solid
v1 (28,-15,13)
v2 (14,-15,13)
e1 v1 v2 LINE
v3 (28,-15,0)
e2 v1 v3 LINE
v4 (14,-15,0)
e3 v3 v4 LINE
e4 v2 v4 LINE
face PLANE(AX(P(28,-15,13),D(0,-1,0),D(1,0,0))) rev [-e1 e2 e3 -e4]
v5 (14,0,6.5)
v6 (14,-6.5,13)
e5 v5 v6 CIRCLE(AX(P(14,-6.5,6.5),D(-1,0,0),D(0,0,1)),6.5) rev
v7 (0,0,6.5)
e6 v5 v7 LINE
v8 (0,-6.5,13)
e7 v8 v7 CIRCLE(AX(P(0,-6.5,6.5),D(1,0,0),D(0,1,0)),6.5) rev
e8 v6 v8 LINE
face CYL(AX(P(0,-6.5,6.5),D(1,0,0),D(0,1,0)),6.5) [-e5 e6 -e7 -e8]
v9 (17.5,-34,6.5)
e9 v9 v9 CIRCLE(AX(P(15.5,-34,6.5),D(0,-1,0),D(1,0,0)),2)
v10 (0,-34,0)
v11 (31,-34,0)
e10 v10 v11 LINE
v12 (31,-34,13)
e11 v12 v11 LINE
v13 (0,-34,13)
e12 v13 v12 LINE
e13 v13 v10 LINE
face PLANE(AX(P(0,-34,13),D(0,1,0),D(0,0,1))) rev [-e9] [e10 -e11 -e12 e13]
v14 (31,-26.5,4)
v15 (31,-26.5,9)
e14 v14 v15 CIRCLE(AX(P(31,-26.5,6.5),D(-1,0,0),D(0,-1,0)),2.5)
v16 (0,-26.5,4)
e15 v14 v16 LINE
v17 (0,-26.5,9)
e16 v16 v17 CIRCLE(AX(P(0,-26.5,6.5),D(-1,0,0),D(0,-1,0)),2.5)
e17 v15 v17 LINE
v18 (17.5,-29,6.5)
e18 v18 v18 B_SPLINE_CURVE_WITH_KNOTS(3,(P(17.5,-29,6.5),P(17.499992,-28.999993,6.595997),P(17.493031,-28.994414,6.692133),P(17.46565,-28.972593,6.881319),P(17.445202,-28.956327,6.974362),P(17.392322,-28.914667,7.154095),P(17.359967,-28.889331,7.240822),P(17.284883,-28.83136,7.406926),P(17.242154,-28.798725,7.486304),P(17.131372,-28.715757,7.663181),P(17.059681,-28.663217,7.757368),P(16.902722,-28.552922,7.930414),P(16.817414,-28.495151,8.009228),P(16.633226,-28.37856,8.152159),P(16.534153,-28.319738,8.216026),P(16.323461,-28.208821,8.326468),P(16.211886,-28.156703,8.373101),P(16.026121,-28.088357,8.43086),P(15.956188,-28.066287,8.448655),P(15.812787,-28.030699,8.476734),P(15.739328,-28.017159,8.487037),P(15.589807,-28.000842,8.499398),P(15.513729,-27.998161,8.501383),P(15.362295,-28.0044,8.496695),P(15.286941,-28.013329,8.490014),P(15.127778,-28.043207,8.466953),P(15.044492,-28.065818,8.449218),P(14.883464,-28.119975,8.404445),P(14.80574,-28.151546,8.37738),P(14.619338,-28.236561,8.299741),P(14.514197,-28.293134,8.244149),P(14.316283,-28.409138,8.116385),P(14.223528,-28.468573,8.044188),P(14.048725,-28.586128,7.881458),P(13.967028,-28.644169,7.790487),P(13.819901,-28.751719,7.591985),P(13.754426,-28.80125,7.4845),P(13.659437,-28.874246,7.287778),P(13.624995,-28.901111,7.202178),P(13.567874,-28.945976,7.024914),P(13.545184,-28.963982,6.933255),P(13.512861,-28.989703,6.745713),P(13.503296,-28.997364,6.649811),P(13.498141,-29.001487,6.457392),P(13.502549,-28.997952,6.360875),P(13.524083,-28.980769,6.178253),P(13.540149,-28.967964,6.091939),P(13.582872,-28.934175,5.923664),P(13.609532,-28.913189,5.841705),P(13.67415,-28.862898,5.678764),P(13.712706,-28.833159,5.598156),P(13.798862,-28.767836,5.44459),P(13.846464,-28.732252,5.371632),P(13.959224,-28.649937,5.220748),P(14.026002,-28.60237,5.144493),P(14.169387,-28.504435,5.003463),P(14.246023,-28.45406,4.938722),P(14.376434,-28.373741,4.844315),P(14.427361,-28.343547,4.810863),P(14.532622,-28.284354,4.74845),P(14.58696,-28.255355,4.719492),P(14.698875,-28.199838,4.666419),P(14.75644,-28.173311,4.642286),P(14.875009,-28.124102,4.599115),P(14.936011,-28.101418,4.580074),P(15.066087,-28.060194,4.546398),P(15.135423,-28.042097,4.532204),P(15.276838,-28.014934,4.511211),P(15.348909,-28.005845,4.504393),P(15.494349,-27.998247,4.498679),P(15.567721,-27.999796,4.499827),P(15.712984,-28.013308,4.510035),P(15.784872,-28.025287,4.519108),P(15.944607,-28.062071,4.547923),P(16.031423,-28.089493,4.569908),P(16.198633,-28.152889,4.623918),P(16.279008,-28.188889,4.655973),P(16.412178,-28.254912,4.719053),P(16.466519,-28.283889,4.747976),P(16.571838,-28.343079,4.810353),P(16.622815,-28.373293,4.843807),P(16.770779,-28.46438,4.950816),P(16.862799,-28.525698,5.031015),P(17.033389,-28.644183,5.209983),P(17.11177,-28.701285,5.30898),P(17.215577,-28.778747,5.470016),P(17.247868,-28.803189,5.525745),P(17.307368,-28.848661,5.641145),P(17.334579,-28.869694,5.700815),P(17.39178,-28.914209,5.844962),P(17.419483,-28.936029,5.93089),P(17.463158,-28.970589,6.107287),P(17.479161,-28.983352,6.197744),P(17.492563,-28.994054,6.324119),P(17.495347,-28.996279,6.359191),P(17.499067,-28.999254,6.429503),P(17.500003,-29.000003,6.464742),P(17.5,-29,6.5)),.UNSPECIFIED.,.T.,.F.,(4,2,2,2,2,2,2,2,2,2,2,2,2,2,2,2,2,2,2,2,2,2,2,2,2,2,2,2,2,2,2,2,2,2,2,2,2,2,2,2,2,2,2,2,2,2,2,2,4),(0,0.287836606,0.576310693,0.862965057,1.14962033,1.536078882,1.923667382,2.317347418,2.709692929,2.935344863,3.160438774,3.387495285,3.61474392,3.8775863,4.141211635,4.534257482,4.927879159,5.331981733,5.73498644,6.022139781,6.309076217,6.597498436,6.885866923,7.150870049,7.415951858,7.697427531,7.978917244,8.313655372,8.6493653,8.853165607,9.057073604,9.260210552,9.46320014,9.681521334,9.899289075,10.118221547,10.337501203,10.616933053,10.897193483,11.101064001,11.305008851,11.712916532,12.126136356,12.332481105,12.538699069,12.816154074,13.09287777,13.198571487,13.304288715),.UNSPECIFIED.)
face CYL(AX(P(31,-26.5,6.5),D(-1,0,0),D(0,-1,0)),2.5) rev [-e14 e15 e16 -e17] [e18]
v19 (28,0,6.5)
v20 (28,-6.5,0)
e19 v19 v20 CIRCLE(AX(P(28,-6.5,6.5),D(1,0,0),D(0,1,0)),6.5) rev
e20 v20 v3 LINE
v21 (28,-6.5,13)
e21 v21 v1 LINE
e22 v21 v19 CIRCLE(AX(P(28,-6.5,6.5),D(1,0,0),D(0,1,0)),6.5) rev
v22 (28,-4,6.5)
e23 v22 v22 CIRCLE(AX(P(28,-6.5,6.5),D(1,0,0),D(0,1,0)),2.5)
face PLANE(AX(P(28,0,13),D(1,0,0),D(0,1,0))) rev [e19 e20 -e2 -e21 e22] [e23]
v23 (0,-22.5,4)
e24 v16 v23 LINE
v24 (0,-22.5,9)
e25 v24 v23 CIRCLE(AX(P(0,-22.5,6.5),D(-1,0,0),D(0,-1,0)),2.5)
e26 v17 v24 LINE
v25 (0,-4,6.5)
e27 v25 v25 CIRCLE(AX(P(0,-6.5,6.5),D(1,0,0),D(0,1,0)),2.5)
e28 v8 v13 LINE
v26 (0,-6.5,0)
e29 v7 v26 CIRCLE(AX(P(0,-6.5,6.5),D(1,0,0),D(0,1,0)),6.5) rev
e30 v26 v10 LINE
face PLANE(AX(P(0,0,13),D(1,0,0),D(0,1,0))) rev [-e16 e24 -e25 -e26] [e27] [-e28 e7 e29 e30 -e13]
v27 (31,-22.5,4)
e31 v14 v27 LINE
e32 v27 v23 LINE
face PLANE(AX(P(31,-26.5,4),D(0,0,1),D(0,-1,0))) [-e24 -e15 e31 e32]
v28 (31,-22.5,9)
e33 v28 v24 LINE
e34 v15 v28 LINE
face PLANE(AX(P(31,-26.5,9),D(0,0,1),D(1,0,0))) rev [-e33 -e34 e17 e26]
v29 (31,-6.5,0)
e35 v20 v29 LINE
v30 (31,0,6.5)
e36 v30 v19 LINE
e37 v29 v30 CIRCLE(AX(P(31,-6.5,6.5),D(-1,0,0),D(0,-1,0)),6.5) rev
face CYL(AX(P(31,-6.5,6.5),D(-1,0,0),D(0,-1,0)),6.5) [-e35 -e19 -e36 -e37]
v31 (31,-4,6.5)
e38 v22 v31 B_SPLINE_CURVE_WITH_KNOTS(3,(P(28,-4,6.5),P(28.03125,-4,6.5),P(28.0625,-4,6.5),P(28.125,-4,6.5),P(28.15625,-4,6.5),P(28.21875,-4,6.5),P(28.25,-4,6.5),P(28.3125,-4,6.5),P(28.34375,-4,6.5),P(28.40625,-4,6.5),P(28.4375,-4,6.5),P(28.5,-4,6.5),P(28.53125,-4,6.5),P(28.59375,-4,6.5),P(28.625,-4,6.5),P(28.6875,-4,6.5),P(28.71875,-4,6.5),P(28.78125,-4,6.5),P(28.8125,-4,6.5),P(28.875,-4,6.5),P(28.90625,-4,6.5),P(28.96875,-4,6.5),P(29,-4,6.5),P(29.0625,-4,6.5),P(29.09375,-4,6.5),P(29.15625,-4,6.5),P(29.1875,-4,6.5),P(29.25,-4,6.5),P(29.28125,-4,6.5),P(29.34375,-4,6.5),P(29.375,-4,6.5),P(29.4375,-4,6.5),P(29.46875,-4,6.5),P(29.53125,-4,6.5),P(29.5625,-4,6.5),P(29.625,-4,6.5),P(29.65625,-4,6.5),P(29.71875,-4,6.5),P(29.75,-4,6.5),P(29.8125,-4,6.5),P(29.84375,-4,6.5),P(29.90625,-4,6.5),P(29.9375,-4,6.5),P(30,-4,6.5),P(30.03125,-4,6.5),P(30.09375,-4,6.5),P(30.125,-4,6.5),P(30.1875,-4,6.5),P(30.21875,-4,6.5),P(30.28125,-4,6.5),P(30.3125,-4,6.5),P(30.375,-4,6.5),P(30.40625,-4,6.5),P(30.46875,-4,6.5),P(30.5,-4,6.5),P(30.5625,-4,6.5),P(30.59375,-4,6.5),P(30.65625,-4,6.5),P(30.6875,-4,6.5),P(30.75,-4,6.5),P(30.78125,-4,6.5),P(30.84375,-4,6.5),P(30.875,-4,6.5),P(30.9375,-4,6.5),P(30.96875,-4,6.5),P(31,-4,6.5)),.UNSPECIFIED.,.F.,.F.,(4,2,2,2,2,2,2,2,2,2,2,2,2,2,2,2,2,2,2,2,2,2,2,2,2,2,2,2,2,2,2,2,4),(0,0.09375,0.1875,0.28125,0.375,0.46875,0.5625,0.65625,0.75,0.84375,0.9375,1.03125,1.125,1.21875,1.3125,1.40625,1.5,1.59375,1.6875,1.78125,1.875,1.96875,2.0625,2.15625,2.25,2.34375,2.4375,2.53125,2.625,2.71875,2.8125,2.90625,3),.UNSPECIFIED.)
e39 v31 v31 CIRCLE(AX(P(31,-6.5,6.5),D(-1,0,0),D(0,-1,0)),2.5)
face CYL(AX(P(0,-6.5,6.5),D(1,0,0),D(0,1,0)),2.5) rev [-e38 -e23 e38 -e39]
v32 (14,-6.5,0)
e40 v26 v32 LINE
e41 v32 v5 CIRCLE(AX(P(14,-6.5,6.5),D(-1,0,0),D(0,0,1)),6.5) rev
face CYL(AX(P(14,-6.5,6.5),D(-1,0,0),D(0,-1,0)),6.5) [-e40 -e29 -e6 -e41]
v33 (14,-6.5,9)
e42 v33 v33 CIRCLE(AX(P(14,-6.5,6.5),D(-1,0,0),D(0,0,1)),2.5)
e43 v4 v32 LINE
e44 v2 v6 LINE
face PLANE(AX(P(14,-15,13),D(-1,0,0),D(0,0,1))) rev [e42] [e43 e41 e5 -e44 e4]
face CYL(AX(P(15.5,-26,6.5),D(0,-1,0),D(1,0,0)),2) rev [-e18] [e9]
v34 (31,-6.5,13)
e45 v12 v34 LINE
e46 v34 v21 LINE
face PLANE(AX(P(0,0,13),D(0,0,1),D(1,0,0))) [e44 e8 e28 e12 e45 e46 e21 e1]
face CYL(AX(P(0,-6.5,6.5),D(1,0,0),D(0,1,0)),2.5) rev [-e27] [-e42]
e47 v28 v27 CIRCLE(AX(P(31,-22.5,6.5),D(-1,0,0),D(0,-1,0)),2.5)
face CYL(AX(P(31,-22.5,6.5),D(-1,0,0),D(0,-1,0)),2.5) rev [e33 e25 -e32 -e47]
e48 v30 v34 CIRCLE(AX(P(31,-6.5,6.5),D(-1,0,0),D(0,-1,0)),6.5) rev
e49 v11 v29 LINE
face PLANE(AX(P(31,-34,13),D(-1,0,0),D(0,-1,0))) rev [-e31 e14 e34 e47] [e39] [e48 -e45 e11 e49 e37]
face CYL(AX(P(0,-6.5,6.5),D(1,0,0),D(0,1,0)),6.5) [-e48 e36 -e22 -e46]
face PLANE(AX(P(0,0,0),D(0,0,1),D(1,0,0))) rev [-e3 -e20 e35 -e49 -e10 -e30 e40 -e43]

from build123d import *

# Parameters (mm, degrees)
BOSS_EXTRUDE1_DEPTH     = 13
CUT_EXTRUDE1_DEPTH      = 48.812132352
CUT_EXTRUDE2_DEPTH      = 48.812132352
CUT_EXTRUDE2_DEPTH_BACK = 48.812132352
SKETCH5_R               = 2.5
FILLET1_R               = 6.5
SKETCH6_R               = 2
CUT_EXTRUDE3_DEPTH      = 8


with BuildPart() as part:
    # Sketch2 → Boss-Extrude1 (new body)
    with BuildSketch(Plane.XY):
        Polygon((0, 0), (0, -34), (31, -34), (31, 0), (28, 0), (28, -15), (14, -15), (14, 0), align=None)
    extrude(amount=BOSS_EXTRUDE1_DEPTH)

    # Sketch4 → Cut-Extrude1 (cut, through all)
    with BuildSketch(Plane.ZY):
        with BuildLine():
            Line((4, -26.5), (4, -22.5))
            ThreePointArc((4, -22.5), (6.5, -20), (9, -22.5))
            Line((9, -22.5), (9, -26.5))
            ThreePointArc((9, -26.5), (6.5, -29), (4, -26.5))
        make_face()
    extrude(amount=-CUT_EXTRUDE1_DEPTH, mode=Mode.SUBTRACT)

    # Sketch5 → Cut-Extrude2 (cut, two sides: drawn at the far end of the back side and taken through both)
    with BuildSketch(Plane(origin=(31, 0, 0), x_dir=(0, 0, -1), z_dir=(1, 0, 0)).offset(-CUT_EXTRUDE2_DEPTH_BACK)):
        with Locations(Location((-6.5, -6.5, 0), (0, 0, 90))):
            Circle(SKETCH5_R)
    extrude(amount=CUT_EXTRUDE2_DEPTH + CUT_EXTRUDE2_DEPTH_BACK, mode=Mode.SUBTRACT)

    # Fillet1
    fillet1_edges = [part.edges().sort_by_distance(p)[0] for p in [
        (29.5, 0, 13),
        (7, 0, 13),
        (7, 0, 0),
        (29.5, 0, 0),
    ]]
    fillet(fillet1_edges, radius=FILLET1_R - 0.0001)  # a hair under: the kernel refuses the full size

    # Sketch6 → Cut-Extrude3 (cut)
    with BuildSketch(Plane.XZ.offset(34)):
        with Locations((15.5, 6.5)):
            Circle(SKETCH6_R)
    extrude(amount=-CUT_EXTRUDE3_DEPTH, mode=Mode.SUBTRACT)


solid = part.part
